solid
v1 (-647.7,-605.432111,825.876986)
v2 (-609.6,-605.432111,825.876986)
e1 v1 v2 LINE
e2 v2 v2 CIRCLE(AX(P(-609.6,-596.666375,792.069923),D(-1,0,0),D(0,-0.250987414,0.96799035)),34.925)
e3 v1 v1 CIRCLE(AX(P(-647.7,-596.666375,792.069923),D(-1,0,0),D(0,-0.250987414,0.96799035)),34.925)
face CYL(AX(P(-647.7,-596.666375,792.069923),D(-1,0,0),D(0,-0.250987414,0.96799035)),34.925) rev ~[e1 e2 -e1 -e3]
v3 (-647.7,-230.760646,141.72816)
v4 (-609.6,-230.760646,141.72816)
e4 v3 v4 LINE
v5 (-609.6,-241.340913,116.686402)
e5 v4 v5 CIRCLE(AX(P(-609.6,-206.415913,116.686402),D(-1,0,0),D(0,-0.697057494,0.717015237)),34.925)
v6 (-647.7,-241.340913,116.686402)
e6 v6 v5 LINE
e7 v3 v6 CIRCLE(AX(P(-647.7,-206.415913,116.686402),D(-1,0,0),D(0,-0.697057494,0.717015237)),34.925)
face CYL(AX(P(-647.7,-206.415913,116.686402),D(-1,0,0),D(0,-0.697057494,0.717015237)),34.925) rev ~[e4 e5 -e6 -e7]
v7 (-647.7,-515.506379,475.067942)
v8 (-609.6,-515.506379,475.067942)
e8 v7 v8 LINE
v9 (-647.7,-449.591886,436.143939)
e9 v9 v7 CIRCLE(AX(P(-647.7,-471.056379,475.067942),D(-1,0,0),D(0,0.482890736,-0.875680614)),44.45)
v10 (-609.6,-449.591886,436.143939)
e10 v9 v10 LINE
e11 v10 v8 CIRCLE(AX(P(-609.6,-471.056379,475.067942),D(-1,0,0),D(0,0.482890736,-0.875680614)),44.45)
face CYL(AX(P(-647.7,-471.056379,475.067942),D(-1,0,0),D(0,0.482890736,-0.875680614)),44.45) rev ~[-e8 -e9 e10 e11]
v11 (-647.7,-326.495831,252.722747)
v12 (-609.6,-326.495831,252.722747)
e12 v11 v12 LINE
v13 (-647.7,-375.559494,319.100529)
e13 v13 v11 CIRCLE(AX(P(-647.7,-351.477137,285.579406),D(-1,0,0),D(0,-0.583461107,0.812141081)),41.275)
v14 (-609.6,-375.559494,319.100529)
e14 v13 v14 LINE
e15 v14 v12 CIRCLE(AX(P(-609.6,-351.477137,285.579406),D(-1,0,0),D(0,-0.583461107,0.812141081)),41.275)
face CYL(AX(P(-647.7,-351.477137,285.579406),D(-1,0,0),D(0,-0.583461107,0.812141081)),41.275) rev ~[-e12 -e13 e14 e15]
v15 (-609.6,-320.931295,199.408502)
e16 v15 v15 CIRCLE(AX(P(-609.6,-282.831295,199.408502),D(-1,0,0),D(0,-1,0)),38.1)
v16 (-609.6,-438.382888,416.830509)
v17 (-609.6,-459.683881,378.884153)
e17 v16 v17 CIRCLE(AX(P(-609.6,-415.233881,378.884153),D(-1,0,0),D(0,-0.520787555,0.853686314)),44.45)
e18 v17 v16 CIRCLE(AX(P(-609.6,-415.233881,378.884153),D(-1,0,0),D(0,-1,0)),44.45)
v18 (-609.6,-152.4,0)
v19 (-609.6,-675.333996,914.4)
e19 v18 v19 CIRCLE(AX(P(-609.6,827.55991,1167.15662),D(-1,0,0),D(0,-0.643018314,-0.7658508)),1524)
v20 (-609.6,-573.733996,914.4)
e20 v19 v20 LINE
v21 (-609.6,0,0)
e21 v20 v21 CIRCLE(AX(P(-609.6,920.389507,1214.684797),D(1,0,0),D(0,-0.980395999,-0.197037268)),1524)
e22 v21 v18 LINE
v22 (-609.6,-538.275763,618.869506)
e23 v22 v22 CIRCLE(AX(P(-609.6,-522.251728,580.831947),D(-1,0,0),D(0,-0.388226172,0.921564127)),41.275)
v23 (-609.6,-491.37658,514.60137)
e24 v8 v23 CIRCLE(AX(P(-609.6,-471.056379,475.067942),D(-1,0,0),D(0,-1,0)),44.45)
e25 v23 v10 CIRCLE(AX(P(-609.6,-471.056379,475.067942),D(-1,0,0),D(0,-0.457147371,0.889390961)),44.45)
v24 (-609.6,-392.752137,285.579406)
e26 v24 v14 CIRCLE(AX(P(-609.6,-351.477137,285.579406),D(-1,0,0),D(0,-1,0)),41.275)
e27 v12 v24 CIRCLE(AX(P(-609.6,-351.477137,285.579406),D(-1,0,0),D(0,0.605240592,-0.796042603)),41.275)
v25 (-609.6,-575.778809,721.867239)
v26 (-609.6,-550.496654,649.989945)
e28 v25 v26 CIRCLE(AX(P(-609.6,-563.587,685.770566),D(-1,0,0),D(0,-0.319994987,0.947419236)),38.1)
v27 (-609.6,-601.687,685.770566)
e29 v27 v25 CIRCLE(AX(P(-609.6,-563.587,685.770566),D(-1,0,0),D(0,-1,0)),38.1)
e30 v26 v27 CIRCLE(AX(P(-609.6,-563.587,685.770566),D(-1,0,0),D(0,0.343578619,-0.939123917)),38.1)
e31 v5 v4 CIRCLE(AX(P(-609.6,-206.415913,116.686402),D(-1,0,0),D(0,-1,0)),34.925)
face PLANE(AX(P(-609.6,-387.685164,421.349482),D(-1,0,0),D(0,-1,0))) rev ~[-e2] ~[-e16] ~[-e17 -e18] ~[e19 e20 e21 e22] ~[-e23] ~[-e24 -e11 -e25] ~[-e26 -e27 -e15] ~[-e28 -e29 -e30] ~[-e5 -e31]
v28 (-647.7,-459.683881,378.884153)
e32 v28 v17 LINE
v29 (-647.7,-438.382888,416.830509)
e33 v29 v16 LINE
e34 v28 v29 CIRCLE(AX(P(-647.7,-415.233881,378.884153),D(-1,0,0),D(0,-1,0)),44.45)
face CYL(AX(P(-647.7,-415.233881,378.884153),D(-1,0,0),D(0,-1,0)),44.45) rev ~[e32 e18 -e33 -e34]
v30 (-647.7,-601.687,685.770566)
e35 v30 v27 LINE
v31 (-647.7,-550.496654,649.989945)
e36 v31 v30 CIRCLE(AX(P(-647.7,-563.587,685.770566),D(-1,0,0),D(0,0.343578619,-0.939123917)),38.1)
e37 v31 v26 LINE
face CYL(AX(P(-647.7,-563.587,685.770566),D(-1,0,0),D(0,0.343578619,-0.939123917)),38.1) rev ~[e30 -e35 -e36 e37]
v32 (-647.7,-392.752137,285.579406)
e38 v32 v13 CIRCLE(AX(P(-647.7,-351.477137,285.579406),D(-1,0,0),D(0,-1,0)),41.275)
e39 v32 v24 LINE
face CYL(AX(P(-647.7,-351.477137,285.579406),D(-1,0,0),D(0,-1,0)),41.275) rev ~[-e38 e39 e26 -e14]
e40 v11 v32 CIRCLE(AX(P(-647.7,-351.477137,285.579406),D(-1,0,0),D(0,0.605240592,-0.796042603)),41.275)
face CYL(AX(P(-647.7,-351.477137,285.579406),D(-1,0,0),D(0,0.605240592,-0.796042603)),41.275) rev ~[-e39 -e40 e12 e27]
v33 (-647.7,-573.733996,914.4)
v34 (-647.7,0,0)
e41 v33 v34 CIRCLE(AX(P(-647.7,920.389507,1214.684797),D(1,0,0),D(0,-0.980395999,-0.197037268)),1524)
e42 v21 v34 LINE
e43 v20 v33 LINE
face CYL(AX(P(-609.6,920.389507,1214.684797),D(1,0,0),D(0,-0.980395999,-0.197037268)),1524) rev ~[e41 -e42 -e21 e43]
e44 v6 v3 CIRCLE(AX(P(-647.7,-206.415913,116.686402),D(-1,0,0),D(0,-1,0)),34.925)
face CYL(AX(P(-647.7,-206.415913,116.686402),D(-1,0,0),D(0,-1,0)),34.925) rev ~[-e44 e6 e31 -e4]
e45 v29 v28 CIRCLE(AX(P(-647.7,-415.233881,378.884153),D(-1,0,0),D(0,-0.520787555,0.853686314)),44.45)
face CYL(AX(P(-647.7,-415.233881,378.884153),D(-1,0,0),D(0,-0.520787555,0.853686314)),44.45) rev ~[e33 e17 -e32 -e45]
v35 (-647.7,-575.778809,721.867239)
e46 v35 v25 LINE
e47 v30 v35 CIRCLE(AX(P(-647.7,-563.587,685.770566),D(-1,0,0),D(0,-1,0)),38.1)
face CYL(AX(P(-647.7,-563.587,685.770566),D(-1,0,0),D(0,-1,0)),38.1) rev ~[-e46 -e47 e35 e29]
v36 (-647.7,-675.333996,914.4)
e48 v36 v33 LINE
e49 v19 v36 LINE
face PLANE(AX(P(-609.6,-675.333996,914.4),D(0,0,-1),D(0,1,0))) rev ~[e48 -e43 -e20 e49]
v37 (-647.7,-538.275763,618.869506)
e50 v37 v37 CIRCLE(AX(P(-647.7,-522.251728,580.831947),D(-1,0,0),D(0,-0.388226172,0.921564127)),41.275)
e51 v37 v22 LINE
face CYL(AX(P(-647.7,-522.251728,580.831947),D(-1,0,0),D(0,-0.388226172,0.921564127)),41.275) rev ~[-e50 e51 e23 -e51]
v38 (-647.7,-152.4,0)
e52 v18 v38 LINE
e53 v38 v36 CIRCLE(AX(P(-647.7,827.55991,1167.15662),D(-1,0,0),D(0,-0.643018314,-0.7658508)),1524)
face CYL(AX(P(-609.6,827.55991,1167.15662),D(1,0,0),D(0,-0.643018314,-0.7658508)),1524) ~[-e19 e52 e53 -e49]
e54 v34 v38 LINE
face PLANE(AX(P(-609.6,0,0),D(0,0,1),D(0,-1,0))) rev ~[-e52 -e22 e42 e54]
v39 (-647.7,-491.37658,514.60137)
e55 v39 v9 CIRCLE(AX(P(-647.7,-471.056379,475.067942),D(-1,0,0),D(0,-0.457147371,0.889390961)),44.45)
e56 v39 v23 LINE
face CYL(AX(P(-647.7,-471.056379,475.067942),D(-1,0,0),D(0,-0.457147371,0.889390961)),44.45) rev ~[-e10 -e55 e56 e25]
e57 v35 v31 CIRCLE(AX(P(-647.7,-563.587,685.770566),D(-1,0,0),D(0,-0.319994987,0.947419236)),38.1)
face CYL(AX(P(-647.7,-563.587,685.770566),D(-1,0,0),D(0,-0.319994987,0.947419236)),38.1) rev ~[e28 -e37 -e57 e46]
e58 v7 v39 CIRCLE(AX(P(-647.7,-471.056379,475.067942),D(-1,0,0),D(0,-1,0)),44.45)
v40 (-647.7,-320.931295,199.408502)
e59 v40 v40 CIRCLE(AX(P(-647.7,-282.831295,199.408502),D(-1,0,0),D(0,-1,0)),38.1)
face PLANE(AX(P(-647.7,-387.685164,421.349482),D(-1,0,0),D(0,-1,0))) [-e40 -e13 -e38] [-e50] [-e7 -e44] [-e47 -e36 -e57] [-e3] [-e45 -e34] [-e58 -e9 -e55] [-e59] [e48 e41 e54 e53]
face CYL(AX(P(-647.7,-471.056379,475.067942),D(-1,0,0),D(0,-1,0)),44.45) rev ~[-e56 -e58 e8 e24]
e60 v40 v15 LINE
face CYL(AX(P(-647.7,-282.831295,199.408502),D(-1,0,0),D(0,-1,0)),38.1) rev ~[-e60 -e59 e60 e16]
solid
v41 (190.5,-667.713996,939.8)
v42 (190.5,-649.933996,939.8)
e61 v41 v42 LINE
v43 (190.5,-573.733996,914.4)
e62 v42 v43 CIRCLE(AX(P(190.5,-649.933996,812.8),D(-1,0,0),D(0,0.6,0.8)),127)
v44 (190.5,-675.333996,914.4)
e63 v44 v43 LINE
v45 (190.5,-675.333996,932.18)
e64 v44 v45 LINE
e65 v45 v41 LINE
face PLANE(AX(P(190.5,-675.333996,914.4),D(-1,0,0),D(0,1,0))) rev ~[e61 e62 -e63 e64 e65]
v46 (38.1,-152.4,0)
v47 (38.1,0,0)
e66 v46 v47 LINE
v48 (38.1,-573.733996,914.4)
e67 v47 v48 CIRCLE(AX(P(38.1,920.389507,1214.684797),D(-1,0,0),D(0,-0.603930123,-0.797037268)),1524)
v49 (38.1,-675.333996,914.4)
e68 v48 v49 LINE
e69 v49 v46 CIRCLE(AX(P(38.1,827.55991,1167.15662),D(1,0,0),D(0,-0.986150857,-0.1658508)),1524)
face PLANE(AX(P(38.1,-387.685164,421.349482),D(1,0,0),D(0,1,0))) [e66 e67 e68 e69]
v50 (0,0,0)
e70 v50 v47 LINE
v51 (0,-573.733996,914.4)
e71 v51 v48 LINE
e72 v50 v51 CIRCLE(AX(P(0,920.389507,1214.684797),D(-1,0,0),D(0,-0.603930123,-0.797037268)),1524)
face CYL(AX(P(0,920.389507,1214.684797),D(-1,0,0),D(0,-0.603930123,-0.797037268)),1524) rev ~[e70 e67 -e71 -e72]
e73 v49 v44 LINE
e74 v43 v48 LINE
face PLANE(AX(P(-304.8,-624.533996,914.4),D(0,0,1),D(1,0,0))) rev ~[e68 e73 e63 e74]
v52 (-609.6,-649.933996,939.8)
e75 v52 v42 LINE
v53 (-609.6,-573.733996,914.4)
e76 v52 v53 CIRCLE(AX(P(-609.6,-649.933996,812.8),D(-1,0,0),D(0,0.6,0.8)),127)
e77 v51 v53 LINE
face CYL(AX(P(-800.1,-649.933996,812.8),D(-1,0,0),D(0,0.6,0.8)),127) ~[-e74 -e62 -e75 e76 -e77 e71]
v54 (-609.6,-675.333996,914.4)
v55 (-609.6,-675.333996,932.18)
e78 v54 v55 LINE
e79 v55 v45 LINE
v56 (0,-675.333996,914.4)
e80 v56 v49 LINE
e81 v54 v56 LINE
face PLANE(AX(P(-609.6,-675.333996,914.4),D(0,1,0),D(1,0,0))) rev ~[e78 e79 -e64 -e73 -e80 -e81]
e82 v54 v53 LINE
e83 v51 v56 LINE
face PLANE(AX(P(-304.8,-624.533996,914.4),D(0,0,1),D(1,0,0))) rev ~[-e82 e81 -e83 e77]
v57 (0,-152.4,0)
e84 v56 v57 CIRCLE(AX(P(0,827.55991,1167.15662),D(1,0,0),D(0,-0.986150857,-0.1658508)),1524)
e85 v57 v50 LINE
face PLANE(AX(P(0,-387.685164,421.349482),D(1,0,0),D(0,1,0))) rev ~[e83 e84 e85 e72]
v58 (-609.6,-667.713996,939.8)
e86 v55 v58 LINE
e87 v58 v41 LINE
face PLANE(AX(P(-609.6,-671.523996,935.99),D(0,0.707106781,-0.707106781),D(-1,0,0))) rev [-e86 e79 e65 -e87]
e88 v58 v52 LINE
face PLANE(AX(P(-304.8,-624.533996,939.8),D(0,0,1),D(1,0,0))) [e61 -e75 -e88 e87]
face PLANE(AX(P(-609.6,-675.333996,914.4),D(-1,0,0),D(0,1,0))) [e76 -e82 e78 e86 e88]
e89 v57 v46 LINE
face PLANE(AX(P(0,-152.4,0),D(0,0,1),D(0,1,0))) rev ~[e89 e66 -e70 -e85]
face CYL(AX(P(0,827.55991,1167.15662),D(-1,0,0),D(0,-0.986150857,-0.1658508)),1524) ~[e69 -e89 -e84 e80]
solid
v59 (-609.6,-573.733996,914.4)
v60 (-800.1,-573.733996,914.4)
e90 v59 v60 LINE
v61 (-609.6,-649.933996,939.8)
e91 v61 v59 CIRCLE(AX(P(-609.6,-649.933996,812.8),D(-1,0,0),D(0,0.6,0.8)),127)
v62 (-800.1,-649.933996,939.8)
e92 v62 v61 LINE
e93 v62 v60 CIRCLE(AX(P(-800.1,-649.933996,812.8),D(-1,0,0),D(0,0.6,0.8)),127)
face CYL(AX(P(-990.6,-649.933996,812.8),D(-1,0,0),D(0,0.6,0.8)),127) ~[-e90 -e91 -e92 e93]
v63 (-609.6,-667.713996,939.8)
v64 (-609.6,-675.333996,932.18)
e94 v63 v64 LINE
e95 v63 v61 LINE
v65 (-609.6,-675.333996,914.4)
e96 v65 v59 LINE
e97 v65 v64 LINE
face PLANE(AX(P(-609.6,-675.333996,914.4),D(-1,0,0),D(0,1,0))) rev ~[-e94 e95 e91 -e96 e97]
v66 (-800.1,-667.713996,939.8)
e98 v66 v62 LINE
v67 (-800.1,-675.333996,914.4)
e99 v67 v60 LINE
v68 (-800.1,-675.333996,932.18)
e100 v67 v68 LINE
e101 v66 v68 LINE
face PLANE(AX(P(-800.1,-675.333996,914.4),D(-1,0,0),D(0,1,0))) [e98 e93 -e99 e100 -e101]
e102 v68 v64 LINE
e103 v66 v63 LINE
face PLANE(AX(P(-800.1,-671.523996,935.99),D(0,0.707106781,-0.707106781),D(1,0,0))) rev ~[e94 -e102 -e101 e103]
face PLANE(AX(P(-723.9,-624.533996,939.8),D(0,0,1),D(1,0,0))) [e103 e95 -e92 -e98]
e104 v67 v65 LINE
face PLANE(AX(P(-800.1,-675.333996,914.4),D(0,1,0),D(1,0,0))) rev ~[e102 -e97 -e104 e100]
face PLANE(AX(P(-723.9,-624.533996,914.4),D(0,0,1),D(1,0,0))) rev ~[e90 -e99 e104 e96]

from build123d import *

# Parameters (mm, degrees)
F1_DEPTH      = 38.1
F2_W          = 609.6
F2_H          = 101.6
F2_W_2        = 152.4
F2_W_3        = 38.1
F3_DEPTH      = 25.4
F5_DEPTH      = 38.1
F6_W          = 152.4
F6_H          = 101.6
F6_W_2        = 38.1
F7_DEPTH      = 25.4
F8_T1_DEPTH   = 342.8999998581
F8_T3_DEPTH   = 38.0999997161
F8_T5_DEPTH   = 800.1000004258
F8_2_T1_DEPTH = 571.5
F9_SIZE       = 7.62
F9_2_SIZE     = 7.62
F11_DEPTH     = 762


# Not quite as in the source:
# - a fillet or chamfer that OpenCascade refuses, or shapes differently, is made with other operations: its cross-section is extruded or revolved along the edge and cut away or added


with BuildPart() as f1:
    # F0 (on Right) → F1 (new body)
    with BuildSketch(Plane.YZ):
        with BuildLine():
            Line((-152.4, 0), (0, 0))
            ThreePointArc((0, 0), (-370.5404323347, 404.6996785445), (-573.7339955129, 914.4))
            Line((-573.7339955129, 914.4), (-675.3339955129, 914.4))
            ThreePointArc((-675.3339955129, 914.4), (-495.3809833516, 410.5831647228), (-152.4, 0))
        make_face()
    extrude(amount=F1_DEPTH)

    # F2 (on face) → F3 (join)
    with BuildSketch(Plane.XY.offset(914.4)):
        with Locations((-304.8, -624.5339955129)):
            Rectangle(F2_W, F2_H)
        with Locations((114.3, -624.5339955129)):
            Rectangle(F2_W_2, F2_H)
        with Locations((19.05, -624.5339955129)):
            Rectangle(F2_W_3, F2_H)
    extrude(amount=F3_DEPTH)

    # F8: fillet of radius 127 on 1 edges, made by hand

    # F8_s2 → F8_t1 (cut)
    with BuildSketch(Plane.YZ.offset(38.1000001419)):
        with BuildLine():
            ThreePointArc((-573.7339955129, 914.4), (-609.7730692288, 933.2827788524), (-649.9339955129, 939.8))
            Line((-649.9339955129, 939.8), (-573.7339955129, 939.8))
            Line((-573.7339955129, 939.8), (-573.7339955129, 914.4))
        make_face()
    extrude(amount=F8_T1_DEPTH, mode=Mode.SUBTRACT)

    # F8_s4 → F8_t3 (cut)
    with BuildSketch(Plane.YZ.offset(4.258e-07)):
        with BuildLine():
            ThreePointArc((-573.7339955129, 914.4), (-609.7730692288, 933.2827788524), (-649.9339955129, 939.8))
            Line((-649.9339955129, 939.8), (-573.7339955129, 939.8))
            Line((-573.7339955129, 939.8), (-573.7339955129, 914.4))
        make_face()
    extrude(amount=F8_T3_DEPTH, mode=Mode.SUBTRACT)

    # F8_s6 → F8_t5 (cut)
    with BuildSketch(Plane.YZ.offset(-800.1)):
        with BuildLine():
            ThreePointArc((-573.7339955129, 914.4), (-609.7730692288, 933.2827788524), (-649.9339955129, 939.8))
            Line((-649.9339955129, 939.8), (-573.7339955129, 939.8))
            Line((-573.7339955129, 939.8), (-573.7339955129, 914.4))
        make_face()
    extrude(amount=F8_T5_DEPTH, mode=Mode.SUBTRACT)

    # F9
    f9_edges = [f1.edges().sort_by_distance(p)[0] for p in [
        (-209.55, -675.333996, 939.8),
    ]]
    chamfer(f9_edges, length=F9_SIZE)


with BuildPart() as f5:
    # F4 (on face) → F5 (new body)
    with BuildSketch(Plane(origin=(-609.6, 0, 0), x_dir=(0, -1, 0), z_dir=(-1, 0, 0))):
        with BuildLine():
            Line((675.3339955129, 914.4), (573.7339955129, 914.4))
            ThreePointArc((573.7339955129, 914.4), (370.5404323347, 404.6996785445), (0, 0))
            Line((0, 0), (152.4, 0))
            ThreePointArc((152.4, 0), (495.3809833516, 410.5831647228), (675.3339955129, 914.4))
        make_face()
    extrude(amount=F5_DEPTH)

    # F10 (on face) → F11 (cut)
    with BuildSketch(Plane(origin=(-647.7, 0, 0), x_dir=(0, -1, 0), z_dir=(-1, 0, 0))):
        with BuildLine():
            ThreePointArc((631.5913753294, 792.0699234096), (624.2879152452, 813.4429474745), (605.4321107523, 825.876986392))
            ThreePointArc((605.4321107523, 825.876986392), (596.6663753294, 792.0699234096), (587.1282473408, 758.472605965))
            ThreePointArc((587.1282473408, 758.472605965), (617.7214994682, 764.2052975822), (631.5913753294, 792.0699234096))
        make_face()
        with BuildLine():
            ThreePointArc((587.1282473408, 758.472605965), (596.6663753294, 792.0699234096), (605.4321107523, 825.876986392))
            ThreePointArc((605.4321107523, 825.876986392), (562.9619724604, 801.2224559686), (587.1282473408, 758.472605965))
        make_face()
        with BuildLine():
            ThreePointArc((550.4966543465, 649.9899449451), (563.5869997391, 685.7705662017), (575.778808754, 721.8672390808))
            ThreePointArc((575.778808754, 721.8672390808), (527.6455446354, 698.4126311054), (550.4966543465, 649.9899449451))
        make_face()
        with BuildLine():
            ThreePointArc((601.6869997391, 685.7705662017), (594.5395272891, 707.986574805), (575.778808754, 721.8672390808))
            ThreePointArc((575.778808754, 721.8672390808), (563.5869997391, 685.7705662017), (550.4966543465, 649.9899449451))
            ThreePointArc((550.4966543465, 649.9899449451), (585.4143660546, 654.5427568048), (601.6869997391, 685.7705662017))
        make_face()
        with BuildLine():
            ThreePointArc((563.5267279961, 580.8319471591), (556.6393542578, 603.6599296605), (538.2757632433, 618.869506484))
            ThreePointArc((538.2757632433, 618.869506484), (522.2517279961, 580.8319471591), (505.2034801813, 543.2422827359))
            ThreePointArc((505.2034801813, 543.2422827359), (544.6119515689, 546.1383450576), (563.5267279961, 580.8319471591))
        make_face()
        with BuildLine():
            ThreePointArc((505.2034801813, 543.2422827359), (522.2517279961, 580.8319471591), (538.2757632433, 618.869506484))
            ThreePointArc((538.2757632433, 618.869506484), (484.4346485768, 597.3696050705), (505.2034801813, 543.2422827359))
        make_face()
        with BuildLine():
            ThreePointArc((491.3765799038, 514.6013703621), (471.0563792428, 475.0679421639), (449.5918860193, 436.1439388927))
            ThreePointArc((449.5918860193, 436.1439388927), (493.658434196, 436.793281984), (515.5063792428, 475.0679421639))
            ThreePointArc((515.5063792428, 475.0679421639), (508.9973558998, 498.2257656867), (491.3765799038, 514.6013703621))
        make_face()
        with BuildLine():
            ThreePointArc((491.3765799038, 514.6013703621), (431.8234913863, 495.962511086), (449.5918860193, 436.1439388927))
            ThreePointArc((449.5918860193, 436.1439388927), (471.0563792428, 475.0679421639), (491.3765799038, 514.6013703621))
        make_face()
        with BuildLine():
            ThreePointArc((438.3828882756, 416.8305093134), (377.6291498002, 402.5840820999), (390.9880699941, 341.6290439297))
            ThreePointArc((390.9880699941, 341.6290439297), (415.2338814717, 378.8841526504), (438.3828882756, 416.8305093134))
        make_face()
        with BuildLine():
            ThreePointArc((438.3828882756, 416.8305093134), (415.2338814717, 378.8841526504), (390.9880699941, 341.6290439297))
            ThreePointArc((390.9880699941, 341.6290439297), (436.4244003401, 339.8103198452), (459.6838814717, 378.8841526504))
            ThreePointArc((459.6838814717, 378.8841526504), (453.9945306693, 400.6422447953), (438.3828882756, 416.8305093134))
        make_face()
        with BuildLine():
            ThreePointArc((375.559494086, 319.1005287315), (351.4771368764, 285.5794055964), (326.4958314478, 252.7227471528))
            ThreePointArc((326.4958314478, 252.7227471528), (369.8145609517, 248.6015135083), (392.7521368764, 285.5794055964))
            ThreePointArc((392.7521368764, 285.5794055964), (388.2033190822, 304.4158905549), (375.559494086, 319.1005287315))
        make_face()
        with BuildLine():
            ThreePointArc((307.2689413413, 228.6388188544), (253.9087320552, 224.2096185946), (257.6705836541, 170.7982132344))
            ThreePointArc((257.6705836541, 170.7982132344), (282.8312945287, 199.4085020881), (307.2689413413, 228.6388188544))
        make_face()
        with BuildLine():
            ThreePointArc((307.2689413413, 228.6388188544), (282.8312945287, 199.4085020881), (257.6705836541, 170.7982132344))
            ThreePointArc((257.6705836541, 170.7982132344), (298.5314046506, 164.6937135656), (320.9312945287, 199.4085020881))
            ThreePointArc((320.9312945287, 199.4085020881), (317.3471194758, 215.5413204475), (307.2689413413, 228.6388188544))
        make_face()
        with BuildLine():
            ThreePointArc((375.559494086, 319.1005287315), (318.2852026333, 310.1134865085), (326.4958314478, 252.7227471528))
            ThreePointArc((326.4958314478, 252.7227471528), (351.4771368764, 285.5794055964), (375.559494086, 319.1005287315))
        make_face()
        with BuildLine():
            ThreePointArc((230.7606464602, 141.7281596434), (181.6547503588, 141.316474077), (181.5037371724, 92.2090844911))
            ThreePointArc((181.5037371724, 92.2090844911), (206.4159134771, 116.686402497), (230.7606464602, 141.7281596434))
        make_face()
        with BuildLine():
            ThreePointArc((230.7606464602, 141.7281596434), (206.4159134771, 116.686402497), (181.5037371724, 92.2090844911))
            ThreePointArc((181.5037371724, 92.2090844911), (219.6389590332, 84.3613860049), (241.3409134771, 116.686402497))
            ThreePointArc((241.3409134771, 116.686402497), (238.5872938052, 130.2789707894), (230.7606464602, 141.7281596434))
        make_face()
    extrude(amount=-F11_DEPTH, mode=Mode.SUBTRACT)


with BuildPart() as f7:
    # F6 (on face) → F7 (new body)
    with BuildSketch(Plane.XY.offset(914.4)):
        with Locations((-723.9, -624.5339955129)):
            Rectangle(F6_W, F6_H)
        with Locations((-628.65, -624.5339955129)):
            Rectangle(F6_W_2, F6_H)
    extrude(amount=F7_DEPTH)

    # F8#2: fillet of radius 127 on 1 edges, made by hand

    # F8_2_s2 → F8_2_t1 (cut)
    with BuildSketch(Plane.YZ.offset(-990.6)):
        with BuildLine():
            ThreePointArc((-573.7339955129, 914.4), (-609.7730692288, 933.2827788524), (-649.9339955129, 939.8))
            Line((-649.9339955129, 939.8), (-573.7339955129, 939.8))
            Line((-573.7339955129, 939.8), (-573.7339955129, 914.4))
        make_face()
    extrude(amount=F8_2_T1_DEPTH, mode=Mode.SUBTRACT)

    # F9#2
    f9_2_edges = [f7.edges().sort_by_distance(p)[0] for p in [
        (-704.85, -675.333996, 939.8),
    ]]
    chamfer(f9_2_edges, length=F9_2_SIZE)


solid = Compound([f1.part, f5.part, f7.part])
